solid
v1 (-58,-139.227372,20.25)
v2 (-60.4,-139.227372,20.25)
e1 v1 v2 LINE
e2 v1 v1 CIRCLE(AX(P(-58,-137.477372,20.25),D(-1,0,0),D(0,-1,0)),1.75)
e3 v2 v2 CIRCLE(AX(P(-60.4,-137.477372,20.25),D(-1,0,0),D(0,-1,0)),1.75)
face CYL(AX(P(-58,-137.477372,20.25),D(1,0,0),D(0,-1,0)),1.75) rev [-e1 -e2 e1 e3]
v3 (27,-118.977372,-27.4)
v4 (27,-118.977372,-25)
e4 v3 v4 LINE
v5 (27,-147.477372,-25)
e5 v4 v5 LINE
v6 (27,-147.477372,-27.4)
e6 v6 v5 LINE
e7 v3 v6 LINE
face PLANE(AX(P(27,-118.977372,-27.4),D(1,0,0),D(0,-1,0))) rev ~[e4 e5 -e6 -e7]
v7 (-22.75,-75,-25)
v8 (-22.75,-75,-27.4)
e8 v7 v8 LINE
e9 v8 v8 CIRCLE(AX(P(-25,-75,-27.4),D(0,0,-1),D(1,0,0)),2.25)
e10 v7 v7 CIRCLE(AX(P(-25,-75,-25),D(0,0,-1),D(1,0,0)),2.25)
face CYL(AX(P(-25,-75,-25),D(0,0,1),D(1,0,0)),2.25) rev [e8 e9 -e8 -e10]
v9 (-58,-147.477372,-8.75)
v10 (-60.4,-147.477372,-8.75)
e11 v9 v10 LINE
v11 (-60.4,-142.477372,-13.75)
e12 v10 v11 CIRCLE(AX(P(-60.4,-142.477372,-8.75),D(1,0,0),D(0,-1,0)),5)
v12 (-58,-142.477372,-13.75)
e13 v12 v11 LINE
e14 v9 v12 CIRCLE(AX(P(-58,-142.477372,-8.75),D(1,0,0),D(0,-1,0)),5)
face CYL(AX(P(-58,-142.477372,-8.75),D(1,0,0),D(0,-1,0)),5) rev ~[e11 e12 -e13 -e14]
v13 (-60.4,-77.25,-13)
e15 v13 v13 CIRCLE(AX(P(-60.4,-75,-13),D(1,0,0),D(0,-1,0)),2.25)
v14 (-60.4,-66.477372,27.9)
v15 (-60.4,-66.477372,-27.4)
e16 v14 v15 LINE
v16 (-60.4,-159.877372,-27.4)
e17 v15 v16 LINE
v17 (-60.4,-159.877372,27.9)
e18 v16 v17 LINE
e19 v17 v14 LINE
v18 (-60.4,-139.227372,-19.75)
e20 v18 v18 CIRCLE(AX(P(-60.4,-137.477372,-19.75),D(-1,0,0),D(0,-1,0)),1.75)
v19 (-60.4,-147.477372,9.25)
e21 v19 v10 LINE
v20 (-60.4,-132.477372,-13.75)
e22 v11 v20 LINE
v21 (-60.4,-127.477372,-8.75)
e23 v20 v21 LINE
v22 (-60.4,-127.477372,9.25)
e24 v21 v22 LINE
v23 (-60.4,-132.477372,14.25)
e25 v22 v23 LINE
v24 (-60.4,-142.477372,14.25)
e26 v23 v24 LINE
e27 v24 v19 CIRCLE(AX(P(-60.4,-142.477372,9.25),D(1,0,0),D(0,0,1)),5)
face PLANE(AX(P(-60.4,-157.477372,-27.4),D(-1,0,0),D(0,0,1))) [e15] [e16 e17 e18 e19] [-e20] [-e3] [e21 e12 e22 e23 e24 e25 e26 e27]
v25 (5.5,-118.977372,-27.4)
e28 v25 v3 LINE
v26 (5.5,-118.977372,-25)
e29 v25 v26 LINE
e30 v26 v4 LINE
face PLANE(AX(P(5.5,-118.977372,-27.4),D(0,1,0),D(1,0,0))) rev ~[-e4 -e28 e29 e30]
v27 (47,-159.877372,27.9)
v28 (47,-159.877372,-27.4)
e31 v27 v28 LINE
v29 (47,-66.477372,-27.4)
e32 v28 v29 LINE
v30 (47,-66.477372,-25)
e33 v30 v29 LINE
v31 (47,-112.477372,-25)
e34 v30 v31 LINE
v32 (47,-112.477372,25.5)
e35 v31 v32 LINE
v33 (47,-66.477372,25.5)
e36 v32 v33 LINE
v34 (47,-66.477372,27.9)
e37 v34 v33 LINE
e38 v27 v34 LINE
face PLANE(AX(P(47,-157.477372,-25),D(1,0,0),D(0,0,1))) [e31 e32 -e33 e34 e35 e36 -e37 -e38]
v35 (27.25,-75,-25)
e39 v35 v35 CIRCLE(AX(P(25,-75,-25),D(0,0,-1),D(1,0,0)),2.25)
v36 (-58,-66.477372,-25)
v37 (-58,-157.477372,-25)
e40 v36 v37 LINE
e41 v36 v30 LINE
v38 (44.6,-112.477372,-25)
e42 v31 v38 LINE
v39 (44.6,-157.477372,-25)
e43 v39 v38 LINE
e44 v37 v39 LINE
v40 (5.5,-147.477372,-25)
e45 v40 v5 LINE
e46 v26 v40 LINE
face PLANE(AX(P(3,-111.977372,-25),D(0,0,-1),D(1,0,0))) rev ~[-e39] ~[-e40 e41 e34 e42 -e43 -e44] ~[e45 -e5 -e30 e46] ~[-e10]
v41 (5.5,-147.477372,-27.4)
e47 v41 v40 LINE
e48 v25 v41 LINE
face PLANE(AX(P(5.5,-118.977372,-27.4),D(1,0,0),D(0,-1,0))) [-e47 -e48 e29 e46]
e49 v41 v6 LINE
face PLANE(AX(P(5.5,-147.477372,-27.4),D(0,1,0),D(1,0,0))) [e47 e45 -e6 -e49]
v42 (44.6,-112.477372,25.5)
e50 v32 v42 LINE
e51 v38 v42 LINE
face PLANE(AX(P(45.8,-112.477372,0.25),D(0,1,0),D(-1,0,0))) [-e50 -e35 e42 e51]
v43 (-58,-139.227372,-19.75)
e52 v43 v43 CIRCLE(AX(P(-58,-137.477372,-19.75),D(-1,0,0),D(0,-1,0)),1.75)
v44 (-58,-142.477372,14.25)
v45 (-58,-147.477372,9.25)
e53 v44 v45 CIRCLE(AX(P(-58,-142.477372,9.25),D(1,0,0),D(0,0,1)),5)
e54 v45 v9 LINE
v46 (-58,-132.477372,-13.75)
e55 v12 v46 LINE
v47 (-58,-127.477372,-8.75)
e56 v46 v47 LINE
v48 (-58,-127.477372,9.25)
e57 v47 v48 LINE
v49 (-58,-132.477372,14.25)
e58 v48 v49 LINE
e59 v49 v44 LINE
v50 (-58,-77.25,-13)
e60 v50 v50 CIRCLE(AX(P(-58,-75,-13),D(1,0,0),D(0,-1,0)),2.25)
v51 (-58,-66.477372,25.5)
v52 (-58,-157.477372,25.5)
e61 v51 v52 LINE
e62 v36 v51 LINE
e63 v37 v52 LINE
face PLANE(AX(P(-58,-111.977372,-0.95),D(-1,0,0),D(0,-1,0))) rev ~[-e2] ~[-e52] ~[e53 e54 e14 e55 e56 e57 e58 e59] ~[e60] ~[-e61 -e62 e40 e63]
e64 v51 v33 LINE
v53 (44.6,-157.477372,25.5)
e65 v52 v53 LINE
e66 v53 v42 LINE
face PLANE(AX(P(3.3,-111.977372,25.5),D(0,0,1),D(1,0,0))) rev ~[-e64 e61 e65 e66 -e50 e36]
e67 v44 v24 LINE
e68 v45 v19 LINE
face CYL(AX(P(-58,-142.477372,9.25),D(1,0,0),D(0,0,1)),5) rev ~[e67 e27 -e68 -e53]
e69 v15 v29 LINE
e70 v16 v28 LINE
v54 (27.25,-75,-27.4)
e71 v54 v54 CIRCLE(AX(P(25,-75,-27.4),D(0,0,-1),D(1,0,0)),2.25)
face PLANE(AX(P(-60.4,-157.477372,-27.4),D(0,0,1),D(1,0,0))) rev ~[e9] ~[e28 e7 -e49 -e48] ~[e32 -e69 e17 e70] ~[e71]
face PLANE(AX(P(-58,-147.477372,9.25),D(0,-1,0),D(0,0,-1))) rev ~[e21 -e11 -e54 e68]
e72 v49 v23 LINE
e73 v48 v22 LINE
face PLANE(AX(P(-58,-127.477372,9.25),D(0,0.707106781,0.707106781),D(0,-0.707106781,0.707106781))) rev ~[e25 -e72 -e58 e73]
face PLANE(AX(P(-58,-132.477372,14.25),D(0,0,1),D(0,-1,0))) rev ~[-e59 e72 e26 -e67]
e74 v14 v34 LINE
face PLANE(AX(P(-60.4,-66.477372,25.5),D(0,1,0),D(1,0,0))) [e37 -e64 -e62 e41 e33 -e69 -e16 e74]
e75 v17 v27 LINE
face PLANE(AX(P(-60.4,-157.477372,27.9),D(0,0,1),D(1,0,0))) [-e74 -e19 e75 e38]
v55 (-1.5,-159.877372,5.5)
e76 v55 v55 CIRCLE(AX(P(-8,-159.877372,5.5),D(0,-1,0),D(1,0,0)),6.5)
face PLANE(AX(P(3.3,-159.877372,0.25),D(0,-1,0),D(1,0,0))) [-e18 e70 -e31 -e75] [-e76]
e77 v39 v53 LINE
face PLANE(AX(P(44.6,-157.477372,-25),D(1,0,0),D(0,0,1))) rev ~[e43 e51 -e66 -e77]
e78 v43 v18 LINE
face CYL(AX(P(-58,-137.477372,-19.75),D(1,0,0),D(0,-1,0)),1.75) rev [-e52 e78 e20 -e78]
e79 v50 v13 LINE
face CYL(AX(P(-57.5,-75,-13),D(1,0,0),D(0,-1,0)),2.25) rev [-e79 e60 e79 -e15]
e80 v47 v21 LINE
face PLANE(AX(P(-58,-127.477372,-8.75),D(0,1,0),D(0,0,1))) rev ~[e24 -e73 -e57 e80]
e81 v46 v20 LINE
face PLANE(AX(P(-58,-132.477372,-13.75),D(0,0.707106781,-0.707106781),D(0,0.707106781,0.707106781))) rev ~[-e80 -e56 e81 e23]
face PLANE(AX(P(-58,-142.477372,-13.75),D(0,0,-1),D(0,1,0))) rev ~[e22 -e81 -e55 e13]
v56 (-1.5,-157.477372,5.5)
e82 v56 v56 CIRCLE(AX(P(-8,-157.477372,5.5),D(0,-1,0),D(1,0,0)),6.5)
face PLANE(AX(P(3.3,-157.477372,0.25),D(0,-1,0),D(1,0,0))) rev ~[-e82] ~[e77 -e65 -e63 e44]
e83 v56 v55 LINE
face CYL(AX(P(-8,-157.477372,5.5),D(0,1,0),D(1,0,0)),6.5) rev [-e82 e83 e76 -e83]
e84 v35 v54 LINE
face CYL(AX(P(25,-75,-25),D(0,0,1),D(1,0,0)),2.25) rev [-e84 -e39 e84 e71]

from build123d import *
from build123d import SkipClean  # not in build123d's __all__

# Parameters (mm, degrees)
F0_W             = 57.5
F0_H             = 50
F1_DEPTH         = 107.5
F2_W             = 55.8
F2_H             = 19
F3_DEPTH         = 42
F4_W             = 0.3
F4_H             = 19
F5_DEPTH         = 48.3
F6_T1_DEPTH      = 65.5
F6_T3_DEPTH      = 67.5
F6_T5_DEPTH      = 225
F6_T7_DEPTH      = 11.7
F6_T9_DEPTH      = 11.7
F6_T11_DEPTH     = 204
F8_W             = 87
F8_H             = 15.3
F9_DEPTH         = 14
F10_W            = 8.2
F10_H            = 14
F11_DEPTH        = 7.4
F12_R            = 2
F13_R            = 2.5
F14_DEPTH        = 4
F15_R            = 1
F19_D            = 3.3
F19_DEPTH        = 5
F19_TIP          = 0.9914200214
F19_ON_F18_D     = 3.3
F19_ON_F18_DEPTH = 5
F19_ON_F18_TIP   = 0.9914200214
F19_ON_F17_D     = 3.3
F19_ON_F17_DEPTH = 5
F19_ON_F17_TIP   = 0.9914200214
F20_W            = 264
F20_H            = 50
F20_R            = 1.5
F21_DEPTH        = 6
F22_W            = 122
F22_H            = 91
F22_R            = 2.25
F23_DEPTH        = 2.4
F24_W            = 91
F24_H            = 52.9
F24_R            = 1.75
F25_DEPTH        = 2.4
F26_R            = 2.25
F27_DEPTH        = 25
F28_W            = 91
F28_H            = 52.9
F29_DEPTH        = 3
F30_R            = 1.75
F31_DEPTH        = 25
F32_W            = 127.4
F32_H            = 91
F33_DEPTH        = 2.4
F34_W            = 127.4
F34_H            = 55.3
F34_R            = 6.5
F35_DEPTH        = 2.4
F36_W            = 21.5
F36_H            = 28.5
F37_DEPTH        = 25
F38_W            = 20
F38_H            = 100
F39_DEPTH        = 60
F43_W            = 2.4
F43_H            = 50.5
F44_DEPTH        = 45


# Not quite as in the source:
# - a fillet or chamfer that OpenCascade refuses, or shapes differently, is made with other operations: its cross-section is extruded or revolved along the edge and cut away or added


with BuildPart() as f1:
    # F0 (on Front) → F1 (new body, symmetric)
    with BuildSketch(Plane.XZ):
        with Locations((-28.75, 0)):
            Rectangle(F0_W, F0_H)
    extrude(amount=F1_DEPTH, both=True)

    # F2 (on face) → F3 (cut)
    with BuildSketch(Plane.XY.offset(25)):
        with Locations((-27.9, -98)):
            Rectangle(F2_W, F2_H)
    extrude(amount=-F3_DEPTH, mode=Mode.SUBTRACT)

    # F4 (on face) → F5 (cut)
    with BuildSketch(Plane.XY.offset(25)):
        Polygon((-55.8, 107.5), (-55.8, -88.5), (-55.5, -88.5), (-55.5, 105.5), (0, 105.5), (0, 105.8), (-55.5, 105.8), (-55.5, 107.5), align=None)
        with Locations((-55.65, -98)):
            Rectangle(F4_W, F4_H)
    extrude(amount=-F5_DEPTH, mode=Mode.SUBTRACT)

    # F6: fillet of radius 2 on 9 edges, made by hand

    # F6_s2 → F6_t1 (cut)
    with BuildSketch(Plane.YZ.offset(-60.5)):
        with BuildLine():
            ThreePointArc((-86.5, 25), (-87.9142135624, 24.4142135624), (-88.5, 23))
            Line((-88.5, 23), (-88.5, 25))
            Line((-88.5, 25), (-86.5, 25))
        make_face()
        with BuildLine():
            ThreePointArc((103.5, 25), (104.9142135624, 24.4142135624), (105.5, 23))
            Line((105.5, 23), (105.5, 25))
            Line((105.5, 25), (103.5, 25))
        make_face()
    extrude(amount=F6_T1_DEPTH, mode=Mode.SUBTRACT)

    # F6_s4 → F6_t3 (cut)
    with BuildSketch(Plane.YZ.offset(-62.5)):
        with BuildLine():
            ThreePointArc((-105.5, -25), (-106.9142135624, -24.4142135624), (-107.5, -23))
            Line((-107.5, -23), (-107.5, -25))
            Line((-107.5, -25), (-105.5, -25))
        make_face()
        with BuildLine():
            ThreePointArc((105.5, -25), (106.9142135624, -24.4142135624), (107.5, -23))
            Line((107.5, -23), (107.5, -25))
            Line((107.5, -25), (105.5, -25))
        make_face()
    extrude(amount=F6_T3_DEPTH, mode=Mode.SUBTRACT)

    # F6_s6 → F6_t5 (cut)
    with BuildSketch(Plane.XZ.offset(-112.5)):
        with BuildLine():
            ThreePointArc((-55.5, -25), (-56.9142135624, -24.4142135624), (-57.5, -23))
            Line((-57.5, -23), (-57.5, -25))
            Line((-57.5, -25), (-55.5, -25))
        make_face()
    extrude(amount=F6_T5_DEPTH, mode=Mode.SUBTRACT)

    # F6_s8 → F6_t7 (cut)
    with BuildSketch(Plane.YZ.offset(-62.5)):
        with BuildLine():
            ThreePointArc((-105.5, 25), (-106.9142135624, 24.4142135624), (-107.5, 23))
            Line((-107.5, 23), (-107.5, 25))
            Line((-107.5, 25), (-105.5, 25))
        make_face()
        with BuildLine():
            ThreePointArc((105.5, 25), (106.9142135624, 24.4142135624), (107.5, 23))
            Line((107.5, 23), (107.5, 25))
            Line((107.5, 25), (105.5, 25))
        make_face()
    extrude(amount=F6_T7_DEPTH, mode=Mode.SUBTRACT)

    # F6_s10 → F6_t9 (cut)
    with BuildSketch(Plane.XZ.offset(-112.5)):
        with BuildLine():
            ThreePointArc((-55.5, 23), (-54.9142135624, 24.4142135624), (-53.5, 25))
            Line((-53.5, 25), (-55.5, 25))
            Line((-55.5, 25), (-55.5, 23))
        make_face()
    extrude(amount=F6_T9_DEPTH, mode=Mode.SUBTRACT)

    # F6_s12 → F6_t11 (cut)
    with BuildSketch(Plane.XZ.offset(-110.5)):
        with BuildLine():
            ThreePointArc((-53.5, 25), (-54.9142135624, 24.4142135624), (-55.5, 23))
            Line((-55.5, 23), (-55.5, 25))
            Line((-55.5, 25), (-53.5, 25))
        make_face()
    with SkipClean():  # cleaning this boolean's faces spoils the solid; the shape is the same uncleaned
        extrude(amount=F6_T11_DEPTH, mode=Mode.SUBTRACT)

    # F7: F1 across plane


with BuildPart() as f1_1:
    add(f1.part, clean=False)
    add(f1.part.mirror(Plane.YZ), clean=False)

    # F19
    with Locations(Plane(origin=(-57.5, 0, 0), x_dir=(0, -1, 0), z_dir=(-1, 0, 0))):
        with Locations((-75, -13), (75, -13)):
            Hole(F19_D / 2, depth=F19_DEPTH)
            with Locations((0, 0, -(F19_DEPTH + F19_TIP / 2))):  # 118° drill point
                Cone(0, F19_D / 2, F19_TIP, mode=Mode.SUBTRACT)

    # F19 on F18
    with Locations(Plane(origin=(0, 0, -25), x_dir=(1, 0, 0), z_dir=(0, 0, -1))):
        with Locations((-25, -75), (-25, 75), (25, -75), (25, 75)):
            Hole(F19_ON_F18_D / 2, depth=F19_ON_F18_DEPTH)
            with Locations((0, 0, -(F19_ON_F18_DEPTH + F19_ON_F18_TIP / 2))):  # 118° drill point
                Cone(0, F19_ON_F18_D / 2, F19_ON_F18_TIP, mode=Mode.SUBTRACT)

    # F19 on F17
    with Locations(Plane.YZ.offset(57.5)):
        with Locations((-75, -13), (-75, 12), (75, 12), (75, -13)):
            Hole(F19_ON_F17_D / 2, depth=F19_ON_F17_DEPTH)
            with Locations((0, 0, -(F19_ON_F17_DEPTH + F19_ON_F17_TIP / 2))):  # 118° drill point
                Cone(0, F19_ON_F17_D / 2, F19_ON_F17_TIP, mode=Mode.SUBTRACT)


with BuildPart() as f9:
    # F8 (on face) → F9 (new body)
    with BuildSketch(Plane.XY.offset(-17)):
        with Locations((9.3, -96.15)):
            Rectangle(F8_W, F8_H)
    extrude(amount=F9_DEPTH)

    # F10 (on face) → F11 (cut)
    with BuildSketch(Plane.XY.offset(-3)):
        with Locations((-28.7, -96.8)):
            Rectangle(F10_W, F10_H)
        with Locations((-19.2, -96.8)):
            Rectangle(F10_W, F10_H)
        with Locations((-9.7, -96.8)):
            Rectangle(F10_W, F10_H)
        with Locations((-0.2, -96.8)):
            Rectangle(F10_W, F10_H)
        with Locations((9.3, -96.8)):
            Rectangle(F10_W, F10_H)
        with Locations((18.8, -96.8)):
            Rectangle(F10_W, F10_H)
        with Locations((28.3, -96.8)):
            Rectangle(F10_W, F10_H)
        with Locations((37.8, -96.8)):
            Rectangle(F10_W, F10_H)
        with Locations((47.3, -96.8)):
            Rectangle(F10_W, F10_H)
    extrude(amount=-F11_DEPTH, mode=Mode.SUBTRACT)

    # F12
    f12_edges = [f9.edges().sort_by_distance(p)[0] for p in [
        (-33.5, -103.8, -3),
        (-23.95, -103.8, -3),
        (-14.45, -103.8, -3),
        (-4.95, -103.8, -3),
        (4.55, -103.8, -3),
        (14.05, -103.8, -3),
        (23.55, -103.8, -3),
        (33.05, -103.8, -3),
        (42.55, -103.8, -3),
        (52.1, -103.8, -3),
    ]]
    fillet(f12_edges, radius=F12_R)

    # F13 (on face) → F14 (join)
    with BuildSketch(Plane.XY.offset(-10.4)):
        with Locations((-28.7, -96.8)):
            Circle(F13_R)
        with Locations((-19.2, -96.8)):
            Circle(F13_R)
        with Locations((-9.7, -96.8)):
            Circle(F13_R)
        with Locations((-0.2, -96.8)):
            Circle(F13_R)
        with Locations((9.3, -96.8)):
            Circle(F13_R)
        with Locations((18.8, -96.8)):
            Circle(F13_R)
        with Locations((28.3, -96.8)):
            Circle(F13_R)
        with Locations((37.8, -96.8)):
            Circle(F13_R)
        with Locations((47.3, -96.8)):
            Circle(F13_R)
    extrude(amount=F14_DEPTH)

    # F15
    f15_edges = [f9.edges().sort_by_distance(p)[0] for p in [
        (-31.2, -96.8, -6.4),
        (-21.7, -96.8, -6.4),
        (-12.2, -96.8, -6.4),
        (-2.7, -96.8, -6.4),
        (6.8, -96.8, -6.4),
        (16.3, -96.8, -6.4),
        (25.8, -96.8, -6.4),
        (35.3, -96.8, -6.4),
        (44.8, -96.8, -6.4),
    ]]
    fillet(f15_edges, radius=F15_R)


with BuildPart() as f21:
    # F20 (on face) → F21 (new body)
    with BuildSketch(Plane.YZ.offset(57.5)):
        with Locations((-24.5, 0)):
            Rectangle(F20_W, F20_H)
        with Locations((-75, -13)):
            Circle(F20_R, mode=Mode.SUBTRACT)
        with Locations((75, -13)):
            Circle(F20_R, mode=Mode.SUBTRACT)
        with Locations((-75, 12)):
            Circle(F20_R, mode=Mode.SUBTRACT)
        with Locations((75, 12)):
            Circle(F20_R, mode=Mode.SUBTRACT)
    extrude(amount=F21_DEPTH)


with BuildPart() as f23:
    # F22 (on face) → F23 (new body)
    with BuildSketch(Plane(origin=(0, 0, -25), x_dir=(1, 0, 0), z_dir=(0, 0, -1))):
        with Locations((3, 111.9773719933)):
            Rectangle(F22_W, F22_H)
        with Locations((-25, 75)):
            Circle(F22_R, mode=Mode.SUBTRACT)
        with Locations((25, 75)):
            Circle(F22_R, mode=Mode.SUBTRACT)
    extrude(amount=F23_DEPTH)

    # F24 (on face) → F25 (join)
    with BuildSketch(Plane(origin=(-58, 0, 0), x_dir=(0, -1, 0), z_dir=(-1, 0, 0))):
        with Locations((111.9773719933, -0.95)):
            Rectangle(F24_W, F24_H)
        with Locations((137.4773719933, -19.75)):
            Circle(F24_R, mode=Mode.SUBTRACT)
        with BuildLine():
            Line((127.4773719933, 9.25), (132.4773719933, 14.25))
            Line((132.4773719933, 14.25), (142.4773719933, 14.25))
            ThreePointArc((142.4773719933, 14.25), (146.0129058993, 12.7855339059), (147.4773719933, 9.25))
            Line((147.4773719933, 9.25), (147.4773719933, -8.75))
            ThreePointArc((147.4773719933, -8.75), (146.0129058993, -12.2855339059), (142.4773719933, -13.75))
            Line((142.4773719933, -13.75), (132.4773719933, -13.75))
            Line((132.4773719933, -13.75), (127.4773719933, -8.75))
            Line((127.4773719933, -8.75), (127.4773719933, 9.25))
        make_face(mode=Mode.SUBTRACT)
        with Locations((137.4773719933, 20.25)):
            Circle(F24_R, mode=Mode.SUBTRACT)
    extrude(amount=F25_DEPTH)

    # F26 (on face) → F27 (cut)
    with BuildSketch(Plane(origin=(-57.5, 0, 0), x_dir=(0, -1, 0), z_dir=(-1, 0, 0))):
        with Locations((75, -13)):
            Circle(F26_R)
    extrude(amount=F27_DEPTH, mode=Mode.SUBTRACT)

    # F28 (on face) → F29 (join)
    with BuildSketch(Plane.YZ.offset(64)):
        with Locations((-111.9773719933, -0.95)):
            Rectangle(F28_W, F28_H)
    extrude(amount=F29_DEPTH)

    # F30 (on face) → F31 (cut)
    with BuildSketch(Plane.YZ.offset(63.5)):
        with Locations((-75, 12)):
            Circle(F30_R)
        with Locations((-75, -13)):
            Circle(F30_R)
    extrude(amount=F31_DEPTH, mode=Mode.SUBTRACT)

    # F32 (on face) → F33 (join)
    with BuildSketch(Plane.XY.offset(25.5)):
        with Locations((3.3, -111.9773719933)):
            Rectangle(F32_W, F32_H)
    extrude(amount=F33_DEPTH)

    # F34 (on face) → F35 (join)
    with BuildSketch(Plane.XZ.offset(157.4773719933)):
        with Locations((3.3, 0.25)):
            Rectangle(F34_W, F34_H)
        with Locations((-8, 5.5)):
            Circle(F34_R, mode=Mode.SUBTRACT)
    extrude(amount=F35_DEPTH)

    # F36 (on face) → F37 (cut)
    with BuildSketch(Plane(origin=(0, 0, -27.4), x_dir=(1, 0, 0), z_dir=(0, 0, -1))):
        with Locations((16.25, 133.2273719933)):
            Rectangle(F36_W, F36_H)
    extrude(amount=-F37_DEPTH, mode=Mode.SUBTRACT)


with BuildPart() as f39_tool:
    # F38 (on face) → F39 (new body)
    with BuildSketch(Plane.XY.offset(27.9)):
        with Locations((57, -109.8773719933)):
            Rectangle(F38_W, F38_H)
    extrude(amount=-F39_DEPTH)


with BuildPart() as f1_2:
    add(f1_1.part, clean=False)

    # F39: cut by f39_tool
    add(f39_tool.part, mode=Mode.SUBTRACT)


with BuildPart() as f9_1:
    add(f9.part, clean=False)

    # F39: cut by f39_tool
    add(f39_tool.part, mode=Mode.SUBTRACT)


with BuildPart() as f21_1:
    add(f21.part, clean=False)

    # F39: cut by f39_tool
    add(f39_tool.part, mode=Mode.SUBTRACT)


with BuildPart() as f23_1:
    add(f23.part, clean=False)

    # F39: cut by f39_tool
    add(f39_tool.part, mode=Mode.SUBTRACT)

    # F43 (on face) → F44 (join)
    with BuildSketch(Plane(origin=(0, -157.4773719933, 0), x_dir=(-1, 0, 0), z_dir=(0, 1, 0))):
        with Locations((-45.8, 0.25)):
            Rectangle(F43_W, F43_H)
    extrude(amount=F44_DEPTH)


solid = f23_1.part
